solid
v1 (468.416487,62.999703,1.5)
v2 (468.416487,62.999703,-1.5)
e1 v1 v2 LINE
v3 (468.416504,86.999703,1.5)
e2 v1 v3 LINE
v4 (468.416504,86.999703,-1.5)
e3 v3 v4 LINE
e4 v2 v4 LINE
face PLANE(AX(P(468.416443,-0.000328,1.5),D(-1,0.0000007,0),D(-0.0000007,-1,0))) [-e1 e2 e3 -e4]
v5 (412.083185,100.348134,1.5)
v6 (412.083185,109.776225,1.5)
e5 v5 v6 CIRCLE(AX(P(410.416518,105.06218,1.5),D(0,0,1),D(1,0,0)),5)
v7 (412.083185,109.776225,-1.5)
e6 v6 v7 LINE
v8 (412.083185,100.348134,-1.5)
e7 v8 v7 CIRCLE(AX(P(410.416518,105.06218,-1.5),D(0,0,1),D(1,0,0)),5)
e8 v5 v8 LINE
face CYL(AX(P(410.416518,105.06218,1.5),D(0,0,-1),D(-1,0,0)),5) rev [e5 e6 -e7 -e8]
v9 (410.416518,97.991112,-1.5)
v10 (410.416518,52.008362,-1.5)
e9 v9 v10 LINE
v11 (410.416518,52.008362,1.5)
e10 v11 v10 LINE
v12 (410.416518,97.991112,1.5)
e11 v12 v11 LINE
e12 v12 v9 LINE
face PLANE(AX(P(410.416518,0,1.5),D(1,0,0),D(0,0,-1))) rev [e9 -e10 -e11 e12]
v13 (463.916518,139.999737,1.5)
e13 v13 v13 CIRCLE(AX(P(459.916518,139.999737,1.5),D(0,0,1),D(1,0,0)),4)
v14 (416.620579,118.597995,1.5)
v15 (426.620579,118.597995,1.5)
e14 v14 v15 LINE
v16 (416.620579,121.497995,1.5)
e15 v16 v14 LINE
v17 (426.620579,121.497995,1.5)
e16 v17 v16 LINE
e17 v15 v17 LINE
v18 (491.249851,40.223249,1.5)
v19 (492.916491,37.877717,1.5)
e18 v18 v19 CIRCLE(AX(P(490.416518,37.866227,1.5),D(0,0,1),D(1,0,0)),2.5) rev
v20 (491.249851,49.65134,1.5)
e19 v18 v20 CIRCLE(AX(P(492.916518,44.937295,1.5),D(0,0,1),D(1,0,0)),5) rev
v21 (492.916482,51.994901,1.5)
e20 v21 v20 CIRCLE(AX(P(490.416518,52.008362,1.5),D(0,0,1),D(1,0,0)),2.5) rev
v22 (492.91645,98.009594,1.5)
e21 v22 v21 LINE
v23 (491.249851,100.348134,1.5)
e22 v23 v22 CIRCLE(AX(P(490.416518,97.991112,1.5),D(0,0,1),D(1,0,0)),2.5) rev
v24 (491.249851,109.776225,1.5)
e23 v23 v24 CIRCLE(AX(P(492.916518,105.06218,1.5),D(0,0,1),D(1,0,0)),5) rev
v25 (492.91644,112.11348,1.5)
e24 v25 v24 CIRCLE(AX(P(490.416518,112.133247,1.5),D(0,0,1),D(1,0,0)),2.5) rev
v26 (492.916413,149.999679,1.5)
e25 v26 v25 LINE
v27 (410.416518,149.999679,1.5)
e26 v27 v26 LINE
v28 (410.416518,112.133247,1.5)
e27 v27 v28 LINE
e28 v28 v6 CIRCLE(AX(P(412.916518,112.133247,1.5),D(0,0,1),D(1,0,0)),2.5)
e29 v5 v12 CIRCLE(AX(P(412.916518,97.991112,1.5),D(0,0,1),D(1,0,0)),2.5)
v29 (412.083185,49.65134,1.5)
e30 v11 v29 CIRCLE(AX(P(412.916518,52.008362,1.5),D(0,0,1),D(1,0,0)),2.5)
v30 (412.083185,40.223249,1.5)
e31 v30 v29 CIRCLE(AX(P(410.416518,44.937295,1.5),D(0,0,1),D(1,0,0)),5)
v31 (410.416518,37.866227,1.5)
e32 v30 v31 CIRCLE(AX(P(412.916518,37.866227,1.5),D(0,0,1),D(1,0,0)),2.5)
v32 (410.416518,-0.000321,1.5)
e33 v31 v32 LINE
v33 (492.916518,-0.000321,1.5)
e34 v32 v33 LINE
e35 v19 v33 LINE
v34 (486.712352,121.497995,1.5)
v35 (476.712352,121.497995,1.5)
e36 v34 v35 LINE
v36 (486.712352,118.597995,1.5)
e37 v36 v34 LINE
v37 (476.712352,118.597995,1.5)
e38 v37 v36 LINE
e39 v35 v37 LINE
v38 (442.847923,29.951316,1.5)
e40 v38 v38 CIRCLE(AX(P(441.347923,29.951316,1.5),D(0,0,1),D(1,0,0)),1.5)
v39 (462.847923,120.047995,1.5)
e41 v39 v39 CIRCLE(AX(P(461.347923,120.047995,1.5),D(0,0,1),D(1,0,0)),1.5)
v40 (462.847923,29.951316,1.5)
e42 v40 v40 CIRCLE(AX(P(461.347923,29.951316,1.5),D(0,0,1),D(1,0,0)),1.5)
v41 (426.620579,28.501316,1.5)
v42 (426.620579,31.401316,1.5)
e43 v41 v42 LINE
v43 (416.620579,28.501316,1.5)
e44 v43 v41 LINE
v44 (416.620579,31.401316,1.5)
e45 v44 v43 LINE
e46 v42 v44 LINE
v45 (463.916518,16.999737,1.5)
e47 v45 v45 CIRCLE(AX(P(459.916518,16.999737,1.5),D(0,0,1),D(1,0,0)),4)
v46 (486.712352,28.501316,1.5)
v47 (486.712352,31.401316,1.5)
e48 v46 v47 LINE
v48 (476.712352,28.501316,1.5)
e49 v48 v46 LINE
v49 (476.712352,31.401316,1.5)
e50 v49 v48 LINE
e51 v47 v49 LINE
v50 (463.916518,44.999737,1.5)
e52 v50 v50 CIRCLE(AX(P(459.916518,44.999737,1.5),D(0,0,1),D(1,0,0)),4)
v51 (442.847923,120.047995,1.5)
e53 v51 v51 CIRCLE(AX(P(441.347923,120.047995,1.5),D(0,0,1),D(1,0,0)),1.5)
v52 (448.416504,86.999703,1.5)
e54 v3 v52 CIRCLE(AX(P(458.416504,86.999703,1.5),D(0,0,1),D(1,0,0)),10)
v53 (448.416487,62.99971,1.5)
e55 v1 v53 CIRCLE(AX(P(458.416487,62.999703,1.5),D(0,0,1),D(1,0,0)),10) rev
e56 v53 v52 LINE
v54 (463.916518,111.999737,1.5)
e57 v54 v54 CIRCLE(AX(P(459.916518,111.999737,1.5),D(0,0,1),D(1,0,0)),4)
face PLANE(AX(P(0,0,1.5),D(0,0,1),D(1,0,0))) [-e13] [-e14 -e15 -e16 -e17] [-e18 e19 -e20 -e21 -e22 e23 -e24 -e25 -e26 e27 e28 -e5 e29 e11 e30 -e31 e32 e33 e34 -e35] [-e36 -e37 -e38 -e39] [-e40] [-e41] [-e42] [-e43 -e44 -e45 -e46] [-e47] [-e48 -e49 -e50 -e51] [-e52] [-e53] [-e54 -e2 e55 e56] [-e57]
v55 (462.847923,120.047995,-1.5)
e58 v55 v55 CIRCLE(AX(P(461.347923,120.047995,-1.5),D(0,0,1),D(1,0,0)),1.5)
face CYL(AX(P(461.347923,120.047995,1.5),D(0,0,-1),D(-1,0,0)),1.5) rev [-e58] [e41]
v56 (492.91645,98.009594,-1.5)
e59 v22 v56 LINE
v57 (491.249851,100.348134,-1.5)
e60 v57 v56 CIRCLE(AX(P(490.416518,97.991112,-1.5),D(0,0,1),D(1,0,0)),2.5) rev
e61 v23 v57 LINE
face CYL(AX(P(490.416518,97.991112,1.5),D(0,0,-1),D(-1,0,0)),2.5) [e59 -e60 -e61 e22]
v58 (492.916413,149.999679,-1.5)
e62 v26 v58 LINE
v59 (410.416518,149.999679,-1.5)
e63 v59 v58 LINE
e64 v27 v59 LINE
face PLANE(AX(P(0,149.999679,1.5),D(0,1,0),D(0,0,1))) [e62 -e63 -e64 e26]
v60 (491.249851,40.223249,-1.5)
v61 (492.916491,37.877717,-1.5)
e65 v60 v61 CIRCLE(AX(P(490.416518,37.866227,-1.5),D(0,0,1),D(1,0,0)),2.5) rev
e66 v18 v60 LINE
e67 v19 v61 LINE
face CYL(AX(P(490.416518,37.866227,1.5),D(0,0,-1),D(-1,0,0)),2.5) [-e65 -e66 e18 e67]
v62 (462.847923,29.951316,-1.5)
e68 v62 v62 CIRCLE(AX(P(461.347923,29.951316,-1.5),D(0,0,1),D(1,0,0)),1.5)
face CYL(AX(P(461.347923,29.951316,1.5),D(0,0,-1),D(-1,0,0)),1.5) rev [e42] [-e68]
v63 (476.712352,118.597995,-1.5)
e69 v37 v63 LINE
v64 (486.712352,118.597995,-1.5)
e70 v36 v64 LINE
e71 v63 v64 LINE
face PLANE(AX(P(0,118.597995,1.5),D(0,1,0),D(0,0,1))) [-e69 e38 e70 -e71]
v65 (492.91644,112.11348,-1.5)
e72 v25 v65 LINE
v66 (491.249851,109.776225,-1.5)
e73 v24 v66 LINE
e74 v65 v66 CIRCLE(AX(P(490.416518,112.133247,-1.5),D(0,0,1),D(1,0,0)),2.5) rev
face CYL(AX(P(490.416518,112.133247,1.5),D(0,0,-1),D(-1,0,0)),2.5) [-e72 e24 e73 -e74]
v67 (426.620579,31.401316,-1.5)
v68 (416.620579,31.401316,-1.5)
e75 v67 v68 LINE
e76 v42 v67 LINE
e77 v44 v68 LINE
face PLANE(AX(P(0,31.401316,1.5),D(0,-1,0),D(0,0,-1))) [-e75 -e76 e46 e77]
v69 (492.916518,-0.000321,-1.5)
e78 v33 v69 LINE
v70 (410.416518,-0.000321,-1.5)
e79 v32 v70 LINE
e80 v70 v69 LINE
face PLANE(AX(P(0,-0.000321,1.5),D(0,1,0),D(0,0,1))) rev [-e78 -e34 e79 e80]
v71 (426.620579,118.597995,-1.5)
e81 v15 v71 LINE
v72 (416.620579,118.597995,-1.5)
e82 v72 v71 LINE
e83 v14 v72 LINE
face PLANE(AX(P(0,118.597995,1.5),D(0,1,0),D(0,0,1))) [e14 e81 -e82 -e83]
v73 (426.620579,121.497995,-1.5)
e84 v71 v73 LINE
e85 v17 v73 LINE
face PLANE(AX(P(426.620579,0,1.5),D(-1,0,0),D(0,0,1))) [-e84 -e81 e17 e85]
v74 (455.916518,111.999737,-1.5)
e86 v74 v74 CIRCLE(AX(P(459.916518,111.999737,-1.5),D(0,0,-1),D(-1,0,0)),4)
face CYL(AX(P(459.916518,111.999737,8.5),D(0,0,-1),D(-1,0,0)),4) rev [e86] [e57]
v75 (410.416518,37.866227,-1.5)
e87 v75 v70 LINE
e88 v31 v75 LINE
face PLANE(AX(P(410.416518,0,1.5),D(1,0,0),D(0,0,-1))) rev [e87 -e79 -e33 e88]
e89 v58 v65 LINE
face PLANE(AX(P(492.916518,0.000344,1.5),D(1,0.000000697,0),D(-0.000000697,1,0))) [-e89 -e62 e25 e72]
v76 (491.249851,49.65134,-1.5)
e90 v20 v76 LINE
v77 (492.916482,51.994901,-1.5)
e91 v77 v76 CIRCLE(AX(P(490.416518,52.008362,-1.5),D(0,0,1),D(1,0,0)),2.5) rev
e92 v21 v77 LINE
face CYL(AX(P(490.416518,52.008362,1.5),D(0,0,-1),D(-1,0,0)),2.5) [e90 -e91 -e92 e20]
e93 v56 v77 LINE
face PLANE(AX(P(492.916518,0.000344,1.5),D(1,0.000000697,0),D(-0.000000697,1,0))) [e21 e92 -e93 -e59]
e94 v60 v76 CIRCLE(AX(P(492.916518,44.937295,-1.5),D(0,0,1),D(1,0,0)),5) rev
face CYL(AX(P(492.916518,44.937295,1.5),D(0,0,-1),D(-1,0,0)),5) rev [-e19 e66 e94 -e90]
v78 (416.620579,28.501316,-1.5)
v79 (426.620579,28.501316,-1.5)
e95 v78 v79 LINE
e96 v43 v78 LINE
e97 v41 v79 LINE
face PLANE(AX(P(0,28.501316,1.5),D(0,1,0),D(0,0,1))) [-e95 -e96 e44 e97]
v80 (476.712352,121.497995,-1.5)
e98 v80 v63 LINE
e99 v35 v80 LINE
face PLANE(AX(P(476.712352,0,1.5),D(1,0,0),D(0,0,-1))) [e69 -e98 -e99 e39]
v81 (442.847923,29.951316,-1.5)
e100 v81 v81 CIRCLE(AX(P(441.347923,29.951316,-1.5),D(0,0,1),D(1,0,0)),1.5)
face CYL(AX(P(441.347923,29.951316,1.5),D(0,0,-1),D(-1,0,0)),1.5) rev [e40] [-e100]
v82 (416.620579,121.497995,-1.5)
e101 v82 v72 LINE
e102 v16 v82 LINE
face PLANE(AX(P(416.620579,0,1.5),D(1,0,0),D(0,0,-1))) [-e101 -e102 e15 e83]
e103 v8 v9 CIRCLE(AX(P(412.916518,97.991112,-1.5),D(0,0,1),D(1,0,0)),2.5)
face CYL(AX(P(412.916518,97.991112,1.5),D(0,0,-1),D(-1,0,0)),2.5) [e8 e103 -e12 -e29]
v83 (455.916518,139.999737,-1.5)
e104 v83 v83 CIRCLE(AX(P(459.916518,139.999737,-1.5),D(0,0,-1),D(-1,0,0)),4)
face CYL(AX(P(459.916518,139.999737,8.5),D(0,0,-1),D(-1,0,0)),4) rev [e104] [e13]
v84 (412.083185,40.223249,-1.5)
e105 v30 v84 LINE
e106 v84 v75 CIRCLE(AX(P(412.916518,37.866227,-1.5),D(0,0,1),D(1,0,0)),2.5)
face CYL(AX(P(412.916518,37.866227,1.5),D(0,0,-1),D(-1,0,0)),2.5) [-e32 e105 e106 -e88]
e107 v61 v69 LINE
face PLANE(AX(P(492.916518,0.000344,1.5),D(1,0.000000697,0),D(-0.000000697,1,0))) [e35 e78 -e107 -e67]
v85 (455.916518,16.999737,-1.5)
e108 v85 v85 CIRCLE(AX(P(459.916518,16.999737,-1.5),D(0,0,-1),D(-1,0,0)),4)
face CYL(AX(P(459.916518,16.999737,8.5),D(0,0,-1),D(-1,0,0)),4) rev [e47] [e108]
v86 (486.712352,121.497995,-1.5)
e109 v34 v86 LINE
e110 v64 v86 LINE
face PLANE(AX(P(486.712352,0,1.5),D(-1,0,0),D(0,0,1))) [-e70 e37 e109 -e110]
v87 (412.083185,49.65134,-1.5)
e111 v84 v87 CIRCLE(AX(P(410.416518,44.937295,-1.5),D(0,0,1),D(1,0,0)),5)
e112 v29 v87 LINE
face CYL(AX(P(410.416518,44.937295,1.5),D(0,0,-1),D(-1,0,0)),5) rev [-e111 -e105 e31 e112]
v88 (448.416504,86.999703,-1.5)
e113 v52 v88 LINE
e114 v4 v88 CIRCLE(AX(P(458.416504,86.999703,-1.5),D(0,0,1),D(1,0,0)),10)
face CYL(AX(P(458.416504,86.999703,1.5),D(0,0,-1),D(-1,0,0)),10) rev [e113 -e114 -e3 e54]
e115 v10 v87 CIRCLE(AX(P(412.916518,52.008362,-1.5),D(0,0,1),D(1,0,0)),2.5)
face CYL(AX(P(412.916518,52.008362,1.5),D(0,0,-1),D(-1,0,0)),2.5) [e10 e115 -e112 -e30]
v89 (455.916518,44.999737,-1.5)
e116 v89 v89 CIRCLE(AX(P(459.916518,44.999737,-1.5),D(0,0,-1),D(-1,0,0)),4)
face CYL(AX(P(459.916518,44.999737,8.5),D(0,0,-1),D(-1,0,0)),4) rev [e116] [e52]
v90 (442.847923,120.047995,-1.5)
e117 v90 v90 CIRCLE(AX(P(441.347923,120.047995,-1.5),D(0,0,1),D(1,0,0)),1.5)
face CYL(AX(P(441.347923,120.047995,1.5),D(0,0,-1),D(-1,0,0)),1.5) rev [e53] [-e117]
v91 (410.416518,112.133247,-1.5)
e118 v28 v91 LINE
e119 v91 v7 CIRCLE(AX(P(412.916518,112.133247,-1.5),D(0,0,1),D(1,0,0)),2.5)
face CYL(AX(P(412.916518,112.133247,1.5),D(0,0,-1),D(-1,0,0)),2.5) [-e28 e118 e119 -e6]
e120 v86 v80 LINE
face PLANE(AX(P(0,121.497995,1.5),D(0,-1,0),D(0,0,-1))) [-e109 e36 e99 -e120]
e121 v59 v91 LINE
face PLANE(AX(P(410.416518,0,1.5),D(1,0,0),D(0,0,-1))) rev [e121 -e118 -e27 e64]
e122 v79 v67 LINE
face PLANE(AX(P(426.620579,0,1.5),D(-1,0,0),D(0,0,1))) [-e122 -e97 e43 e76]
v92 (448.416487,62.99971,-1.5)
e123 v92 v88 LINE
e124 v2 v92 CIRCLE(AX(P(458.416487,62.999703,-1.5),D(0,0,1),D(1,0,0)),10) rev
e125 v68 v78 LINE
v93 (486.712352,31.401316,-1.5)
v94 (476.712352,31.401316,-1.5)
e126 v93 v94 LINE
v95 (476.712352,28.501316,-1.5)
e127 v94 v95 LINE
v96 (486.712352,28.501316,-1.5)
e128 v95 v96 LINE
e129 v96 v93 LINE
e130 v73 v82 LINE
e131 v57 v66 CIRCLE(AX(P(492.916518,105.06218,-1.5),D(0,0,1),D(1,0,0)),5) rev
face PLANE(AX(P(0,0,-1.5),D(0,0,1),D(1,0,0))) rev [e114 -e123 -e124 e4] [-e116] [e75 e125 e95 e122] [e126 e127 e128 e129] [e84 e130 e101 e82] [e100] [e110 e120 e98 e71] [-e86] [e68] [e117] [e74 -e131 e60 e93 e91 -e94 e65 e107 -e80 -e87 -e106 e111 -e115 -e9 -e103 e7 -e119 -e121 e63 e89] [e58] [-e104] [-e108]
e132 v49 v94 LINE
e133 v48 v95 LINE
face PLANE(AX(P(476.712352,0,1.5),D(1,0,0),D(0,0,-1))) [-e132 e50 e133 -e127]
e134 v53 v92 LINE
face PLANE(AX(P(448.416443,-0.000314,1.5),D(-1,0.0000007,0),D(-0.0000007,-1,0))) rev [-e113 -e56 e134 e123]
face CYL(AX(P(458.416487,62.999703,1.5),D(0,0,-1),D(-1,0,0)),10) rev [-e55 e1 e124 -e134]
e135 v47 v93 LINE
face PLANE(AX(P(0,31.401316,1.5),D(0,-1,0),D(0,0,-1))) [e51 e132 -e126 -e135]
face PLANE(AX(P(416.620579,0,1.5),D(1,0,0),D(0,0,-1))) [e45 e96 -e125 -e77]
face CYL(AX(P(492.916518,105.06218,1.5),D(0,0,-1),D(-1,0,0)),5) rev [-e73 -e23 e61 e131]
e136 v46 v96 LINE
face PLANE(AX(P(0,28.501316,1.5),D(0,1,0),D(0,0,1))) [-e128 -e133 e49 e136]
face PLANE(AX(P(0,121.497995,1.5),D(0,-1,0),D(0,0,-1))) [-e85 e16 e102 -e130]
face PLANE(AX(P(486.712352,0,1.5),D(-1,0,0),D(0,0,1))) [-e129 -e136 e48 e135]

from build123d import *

# Parameters (mm, degrees)
SALIENTE_EXTRUIR1_START     = -1.5
SALIENTE_EXTRUIR1_OUTLINE_W = 10
SALIENTE_EXTRUIR1_OUTLINE_H = 2.9
SALIENTE_EXTRUIR1_OUTLINE_R = 1.5
SALIENTE_EXTRUIR1_DEPTH     = 3
CROQUIS2_R                  = 4
CORTAR_EXTRUIR1_DEPTH       = 10


# Read off the part's stored shape, not the designer's step: Saliente-Extruir1
with BuildPart() as part:
    # Saliente-Extruir1 outline → Saliente-Extruir1 (new body)
    with BuildSketch(Plane.XY.offset(SALIENTE_EXTRUIR1_START)):
        with BuildLine():
            ThreePointArc((492.916449572, 98.009593947), (492.452410006, 99.442022929), (491.249851225, 100.348134338))
            ThreePointArc((491.249851225, 100.348134338), (487.916517891, 105.062179546), (491.249851225, 109.776224754))
            ThreePointArc((491.249851225, 109.776224754), (492.452037009, 110.681812922), (492.916439741, 112.113480025))
            Line((492.916439741, 112.113480025), (492.916413331, 149.999679341))
            Line((492.916413331, 149.999679341), (410.416517891, 149.999679341))
            Line((410.416517891, 149.999679341), (410.416517891, 112.133247358))
            ThreePointArc((410.416517891, 112.133247358), (410.875276439, 110.689871685), (412.083184558, 109.776224754))
            ThreePointArc((412.083184558, 109.776224754), (415.416517891, 105.062179546), (412.083184558, 100.348134338))
            ThreePointArc((412.083184558, 100.348134338), (410.875276439, 99.434487407), (410.416517891, 97.991111734))
            Line((410.416517891, 97.991111734), (410.416517891, 52.008362374))
            ThreePointArc((410.416517891, 52.008362374), (410.875276439, 50.564986701), (412.083184558, 49.65133977))
            ThreePointArc((412.083184558, 49.65133977), (415.416517891, 44.937294562), (412.083184558, 40.223249354))
            ThreePointArc((412.083184558, 40.223249354), (410.875276439, 39.309602423), (410.416517891, 37.86622675))
            Line((410.416517891, 37.86622675), (410.416517891, -0.000320659))
            Line((410.416517891, -0.000320659), (492.916517891, -0.000320659))
            Line((492.916517891, -0.000320659), (492.916491488, 37.877716604))
            ThreePointArc((492.916491488, 37.877716604), (492.45443711, 39.314289338), (491.249851225, 40.223249354))
            ThreePointArc((491.249851225, 40.223249354), (487.916517891, 44.937294562), (491.249851225, 49.65133977))
            ThreePointArc((491.249851225, 49.65133977), (492.453865854, 50.559496169), (492.916481647, 51.994900607))
            Line((492.916481647, 51.994900607), (492.916449572, 98.009593947))
        make_face()
        with Locations((421.620579276, 29.951315893)):
            Rectangle(SALIENTE_EXTRUIR1_OUTLINE_W, SALIENTE_EXTRUIR1_OUTLINE_H, mode=Mode.SUBTRACT)
        with Locations((441.347923427, 29.951315893)):
            Circle(SALIENTE_EXTRUIR1_OUTLINE_R, mode=Mode.SUBTRACT)
        with Locations((461.347923427, 29.951315893)):
            Circle(SALIENTE_EXTRUIR1_OUTLINE_R, mode=Mode.SUBTRACT)
        with Locations((481.712351947, 29.951315893)):
            Rectangle(SALIENTE_EXTRUIR1_OUTLINE_W, SALIENTE_EXTRUIR1_OUTLINE_H, mode=Mode.SUBTRACT)
        with Locations((421.620579275, 120.047994692)):
            Rectangle(SALIENTE_EXTRUIR1_OUTLINE_W, SALIENTE_EXTRUIR1_OUTLINE_H, mode=Mode.SUBTRACT)
        with Locations((441.347923427, 120.047994692)):
            Circle(SALIENTE_EXTRUIR1_OUTLINE_R, mode=Mode.SUBTRACT)
        with BuildLine():
            ThreePointArc((448.416504048, 86.999703476), (458.416504048, 96.999703476), (468.416504048, 86.999703476))
            Line((468.416504048, 86.999703476), (468.416487259, 62.999703476))
            ThreePointArc((468.416487259, 62.999703476), (458.416483767, 52.999703476), (448.416487259, 62.999710459))
            Line((448.416487259, 62.999710459), (448.416504048, 86.999703476))
        make_face(mode=Mode.SUBTRACT)
        with Locations((461.347923427, 120.047994692)):
            Circle(SALIENTE_EXTRUIR1_OUTLINE_R, mode=Mode.SUBTRACT)
        with Locations((481.712351947, 120.047994692)):
            Rectangle(SALIENTE_EXTRUIR1_OUTLINE_W, SALIENTE_EXTRUIR1_OUTLINE_H, mode=Mode.SUBTRACT)
    extrude(amount=SALIENTE_EXTRUIR1_DEPTH)

    # Croquis2 → Cortar-Extruir1 (cut)
    with BuildSketch(Plane(origin=(0, 0, -1.5), x_dir=(-1, 0, 0), z_dir=(0, 0, -1))):
        with Locations((-459.916517891, 16.999737054)):
            Circle(CROQUIS2_R)
        with Locations((-459.916517891, 44.999737054)):
            Circle(CROQUIS2_R)
        with Locations((-459.916517891, 111.999737054)):
            Circle(CROQUIS2_R)
        with Locations((-459.916517891, 139.999737054)):
            Circle(CROQUIS2_R)
    extrude(amount=-CORTAR_EXTRUIR1_DEPTH, mode=Mode.SUBTRACT)


solid = part.part
